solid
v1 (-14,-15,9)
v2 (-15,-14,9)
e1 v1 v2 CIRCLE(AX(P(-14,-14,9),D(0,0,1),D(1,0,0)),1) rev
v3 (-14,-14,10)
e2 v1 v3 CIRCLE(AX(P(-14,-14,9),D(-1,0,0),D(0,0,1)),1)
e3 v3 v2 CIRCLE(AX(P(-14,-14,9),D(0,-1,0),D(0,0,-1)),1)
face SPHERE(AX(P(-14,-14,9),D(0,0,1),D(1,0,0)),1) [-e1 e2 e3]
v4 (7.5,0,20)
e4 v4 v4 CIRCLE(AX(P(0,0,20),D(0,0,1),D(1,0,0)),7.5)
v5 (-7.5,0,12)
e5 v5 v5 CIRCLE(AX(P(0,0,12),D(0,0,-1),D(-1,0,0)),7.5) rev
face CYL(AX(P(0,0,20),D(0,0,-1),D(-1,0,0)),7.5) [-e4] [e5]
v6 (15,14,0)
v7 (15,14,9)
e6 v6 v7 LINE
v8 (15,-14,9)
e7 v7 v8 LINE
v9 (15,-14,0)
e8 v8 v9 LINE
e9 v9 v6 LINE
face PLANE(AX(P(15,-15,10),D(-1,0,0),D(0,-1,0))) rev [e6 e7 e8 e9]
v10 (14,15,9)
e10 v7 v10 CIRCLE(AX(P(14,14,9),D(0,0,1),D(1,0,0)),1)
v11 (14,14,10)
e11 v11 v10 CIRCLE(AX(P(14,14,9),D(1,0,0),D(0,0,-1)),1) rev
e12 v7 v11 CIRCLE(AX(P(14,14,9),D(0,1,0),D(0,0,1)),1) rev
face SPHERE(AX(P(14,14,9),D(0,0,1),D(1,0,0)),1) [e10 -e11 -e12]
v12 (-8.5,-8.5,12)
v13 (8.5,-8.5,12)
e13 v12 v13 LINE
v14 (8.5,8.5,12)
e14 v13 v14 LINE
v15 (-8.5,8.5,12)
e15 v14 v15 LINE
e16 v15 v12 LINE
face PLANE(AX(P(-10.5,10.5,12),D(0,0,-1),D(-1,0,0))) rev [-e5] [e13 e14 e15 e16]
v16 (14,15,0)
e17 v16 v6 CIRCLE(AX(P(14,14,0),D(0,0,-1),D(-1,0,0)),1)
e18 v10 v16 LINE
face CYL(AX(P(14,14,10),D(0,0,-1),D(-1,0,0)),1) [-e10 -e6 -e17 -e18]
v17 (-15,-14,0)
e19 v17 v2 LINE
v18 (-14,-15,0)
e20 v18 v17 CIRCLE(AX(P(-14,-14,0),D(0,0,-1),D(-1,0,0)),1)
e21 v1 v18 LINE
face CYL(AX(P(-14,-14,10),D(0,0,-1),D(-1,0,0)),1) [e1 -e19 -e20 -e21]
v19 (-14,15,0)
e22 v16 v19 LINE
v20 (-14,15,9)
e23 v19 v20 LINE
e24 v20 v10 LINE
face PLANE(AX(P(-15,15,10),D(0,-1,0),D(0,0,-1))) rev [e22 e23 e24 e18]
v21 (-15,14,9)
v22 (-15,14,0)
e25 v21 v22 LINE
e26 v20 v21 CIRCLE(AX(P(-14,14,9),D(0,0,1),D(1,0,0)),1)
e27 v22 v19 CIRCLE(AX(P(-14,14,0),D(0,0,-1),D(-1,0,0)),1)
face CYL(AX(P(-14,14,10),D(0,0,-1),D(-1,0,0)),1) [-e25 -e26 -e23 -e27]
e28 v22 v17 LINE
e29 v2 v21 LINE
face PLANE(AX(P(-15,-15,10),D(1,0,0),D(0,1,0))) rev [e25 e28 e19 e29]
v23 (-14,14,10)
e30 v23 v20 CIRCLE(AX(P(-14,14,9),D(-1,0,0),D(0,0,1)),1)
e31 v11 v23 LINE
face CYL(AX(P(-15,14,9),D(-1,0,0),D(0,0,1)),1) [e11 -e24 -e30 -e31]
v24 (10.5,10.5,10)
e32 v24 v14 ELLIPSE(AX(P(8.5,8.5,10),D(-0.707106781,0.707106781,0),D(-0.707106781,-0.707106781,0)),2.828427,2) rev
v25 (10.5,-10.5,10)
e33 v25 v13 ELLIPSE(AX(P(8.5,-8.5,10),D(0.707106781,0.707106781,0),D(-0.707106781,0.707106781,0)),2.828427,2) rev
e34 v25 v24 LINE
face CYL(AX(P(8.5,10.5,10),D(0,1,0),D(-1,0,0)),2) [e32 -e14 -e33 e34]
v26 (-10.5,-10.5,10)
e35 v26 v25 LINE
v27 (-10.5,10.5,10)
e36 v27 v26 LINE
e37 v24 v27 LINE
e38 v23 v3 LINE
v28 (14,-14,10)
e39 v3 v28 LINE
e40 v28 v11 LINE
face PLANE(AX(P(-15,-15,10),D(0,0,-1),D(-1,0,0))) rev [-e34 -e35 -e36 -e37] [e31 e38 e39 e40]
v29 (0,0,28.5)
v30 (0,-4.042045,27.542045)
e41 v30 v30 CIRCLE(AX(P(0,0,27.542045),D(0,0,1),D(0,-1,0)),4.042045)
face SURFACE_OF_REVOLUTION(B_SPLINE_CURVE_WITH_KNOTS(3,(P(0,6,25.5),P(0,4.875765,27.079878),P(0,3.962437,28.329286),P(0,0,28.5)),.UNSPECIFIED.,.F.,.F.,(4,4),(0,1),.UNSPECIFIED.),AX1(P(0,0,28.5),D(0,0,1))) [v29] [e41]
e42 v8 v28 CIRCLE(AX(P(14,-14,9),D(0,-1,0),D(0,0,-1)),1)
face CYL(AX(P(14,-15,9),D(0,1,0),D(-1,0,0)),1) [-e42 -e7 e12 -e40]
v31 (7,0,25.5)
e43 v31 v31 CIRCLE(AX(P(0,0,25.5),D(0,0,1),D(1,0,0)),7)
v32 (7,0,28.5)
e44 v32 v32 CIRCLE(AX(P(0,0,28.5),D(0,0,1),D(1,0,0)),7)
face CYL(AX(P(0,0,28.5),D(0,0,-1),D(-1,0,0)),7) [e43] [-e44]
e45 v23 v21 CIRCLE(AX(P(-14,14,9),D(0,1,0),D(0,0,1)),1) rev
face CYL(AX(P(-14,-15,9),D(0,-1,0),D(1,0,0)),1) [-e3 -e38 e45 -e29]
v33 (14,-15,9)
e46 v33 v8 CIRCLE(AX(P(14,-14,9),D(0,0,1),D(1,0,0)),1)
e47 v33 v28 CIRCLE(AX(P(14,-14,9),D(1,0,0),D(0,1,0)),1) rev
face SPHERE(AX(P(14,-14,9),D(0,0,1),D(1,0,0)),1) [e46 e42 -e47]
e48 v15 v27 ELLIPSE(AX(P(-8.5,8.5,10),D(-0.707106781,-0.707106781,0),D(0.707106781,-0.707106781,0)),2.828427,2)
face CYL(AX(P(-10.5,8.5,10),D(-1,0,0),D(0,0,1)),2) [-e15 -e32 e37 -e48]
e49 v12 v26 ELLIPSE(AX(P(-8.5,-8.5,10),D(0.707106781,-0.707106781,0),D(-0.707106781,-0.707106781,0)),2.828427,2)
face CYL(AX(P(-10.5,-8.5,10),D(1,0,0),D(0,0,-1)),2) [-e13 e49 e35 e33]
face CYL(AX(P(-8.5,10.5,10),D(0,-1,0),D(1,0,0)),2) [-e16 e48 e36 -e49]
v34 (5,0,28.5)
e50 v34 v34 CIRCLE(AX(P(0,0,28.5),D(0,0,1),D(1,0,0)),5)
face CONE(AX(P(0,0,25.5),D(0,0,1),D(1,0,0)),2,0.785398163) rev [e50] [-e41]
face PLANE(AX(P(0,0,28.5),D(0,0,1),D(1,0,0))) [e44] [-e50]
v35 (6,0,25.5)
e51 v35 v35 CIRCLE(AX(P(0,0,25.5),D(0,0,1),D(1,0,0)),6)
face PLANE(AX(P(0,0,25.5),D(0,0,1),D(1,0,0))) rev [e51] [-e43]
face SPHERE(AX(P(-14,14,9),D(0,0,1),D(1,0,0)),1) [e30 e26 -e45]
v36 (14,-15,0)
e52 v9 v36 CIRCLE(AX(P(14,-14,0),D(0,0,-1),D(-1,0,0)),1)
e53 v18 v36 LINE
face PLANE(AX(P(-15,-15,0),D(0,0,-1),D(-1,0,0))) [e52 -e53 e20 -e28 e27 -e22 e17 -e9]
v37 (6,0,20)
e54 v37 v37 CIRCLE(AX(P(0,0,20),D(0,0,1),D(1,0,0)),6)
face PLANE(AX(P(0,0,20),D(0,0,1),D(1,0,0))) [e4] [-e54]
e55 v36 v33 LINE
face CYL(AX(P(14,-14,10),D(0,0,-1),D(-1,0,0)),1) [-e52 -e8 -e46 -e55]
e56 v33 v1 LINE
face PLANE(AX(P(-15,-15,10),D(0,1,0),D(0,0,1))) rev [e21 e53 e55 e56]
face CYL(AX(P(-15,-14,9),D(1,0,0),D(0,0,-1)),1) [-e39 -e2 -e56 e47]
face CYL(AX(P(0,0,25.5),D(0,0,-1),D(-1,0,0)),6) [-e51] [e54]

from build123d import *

# Parameters (mm, degrees)
SKETCH1_W          = 30
SKETCH1_H          = 30
EXTRUDE1_DEPTH     = 10
SKETCH2_W          = 21
SKETCH2_H          = 21
EXTRUDE2_DEPTH     = 2
SKETCH3_R          = 7.5
EXTRUDE3_DEPTH     = 8
SKETCH4_R          = 6
EXTRUDE4_DEPTH     = 5.5
SKETCH5_R          = 7
EXTRUDE5_DEPTH     = 3
SKETCH6_R          = 5
CUT_EXTRUDE1_DEPTH = 3
CHAMFER1_SIZE      = 3
FILLET1_R          = 1
FILLET2_R          = 2


with BuildPart() as part:
    # Sketch1 → Extrude1 (new body)
    with BuildSketch(Plane.XY):
        Rectangle(SKETCH1_W, SKETCH1_H)
    extrude(amount=EXTRUDE1_DEPTH)

    # Sketch2 → Extrude2 (add)
    with BuildSketch(Plane.XY.offset(10)):
        Rectangle(SKETCH2_W, SKETCH2_H)
    extrude(amount=EXTRUDE2_DEPTH)

    # Sketch3 → Extrude3 (add)
    with BuildSketch(Plane.XY.offset(12)):
        with Locations(Location((0, 0, 0), (0, 0, 180))):
            Circle(SKETCH3_R)
    extrude(amount=EXTRUDE3_DEPTH)

    # Sketch4 → Extrude4 (add)
    with BuildSketch(Plane.XY.offset(20)):
        Circle(SKETCH4_R)
    extrude(amount=EXTRUDE4_DEPTH)

    # Sketch5 → Extrude5 (add)
    with BuildSketch(Plane.XY.offset(25.5)):
        Circle(SKETCH5_R)
    extrude(amount=EXTRUDE5_DEPTH)

    # Sketch6 → Cut-Extrude1 (cut)
    with BuildSketch(Plane.XY.offset(28.5)):
        Circle(SKETCH6_R)
    extrude(amount=-CUT_EXTRUDE1_DEPTH, mode=Mode.SUBTRACT)

    # Chamfer1
    chamfer1_edges = [part.edges().sort_by_distance(p)[0] for p in [
        (-5, 0, 25.5),
    ]]
    chamfer(chamfer1_edges, length=CHAMFER1_SIZE - 0.0001)  # a hair under: the kernel refuses the full size

    # Sketch8 → Revolve1 (revolve)
    with BuildSketch(Plane(origin=(0, 0, 0), x_dir=(0, 0, -1), z_dir=(1, 0, 0)), mode=Mode.PRIVATE) as revolve1_sk:
        with BuildLine():
            Line((-25.5, 0), (-25.5, 6))
            add(Edge.make_bspline(
                [(-28.5, 0), (-28.329286333, 3.962436502), (-27.079878372, 4.87576544), (-25.5, 6)],
                knots=[0, 0, 0, 0, 1, 1, 1, 1], degree=3))
            Line((-28.5, 0), (-25.5, 0))
        make_face()
    revolve(revolve1_sk.sketch.rotate(Axis((0, 0, 28.5), (0, 0, -1)), 90), axis=Axis((0, 0, 28.5), (0, 0, -1)))

    # Fillet1
    fillet1_edges = [part.edges().sort_by_distance(p)[0] for p in [
        (15, 0, 10),
        (0, 15, 10),
        (-15, 0, 10),
        (0, -15, 10),
        (-15, 15, 5),
        (15, 15, 5),
        (15, -15, 5),
        (-15, -15, 5),
    ]]
    fillet(fillet1_edges, radius=FILLET1_R)

    # Fillet2
    fillet2_edges = [part.edges().sort_by_distance(p)[0] for p in [
        (0, -10.5, 12),
        (10.5, 0, 12),
        (0, 10.5, 12),
        (-10.5, 0, 12),
    ]]
    fillet(fillet2_edges, radius=FILLET2_R - 0.0001)  # a hair under: the kernel refuses the full size


solid = part.part
